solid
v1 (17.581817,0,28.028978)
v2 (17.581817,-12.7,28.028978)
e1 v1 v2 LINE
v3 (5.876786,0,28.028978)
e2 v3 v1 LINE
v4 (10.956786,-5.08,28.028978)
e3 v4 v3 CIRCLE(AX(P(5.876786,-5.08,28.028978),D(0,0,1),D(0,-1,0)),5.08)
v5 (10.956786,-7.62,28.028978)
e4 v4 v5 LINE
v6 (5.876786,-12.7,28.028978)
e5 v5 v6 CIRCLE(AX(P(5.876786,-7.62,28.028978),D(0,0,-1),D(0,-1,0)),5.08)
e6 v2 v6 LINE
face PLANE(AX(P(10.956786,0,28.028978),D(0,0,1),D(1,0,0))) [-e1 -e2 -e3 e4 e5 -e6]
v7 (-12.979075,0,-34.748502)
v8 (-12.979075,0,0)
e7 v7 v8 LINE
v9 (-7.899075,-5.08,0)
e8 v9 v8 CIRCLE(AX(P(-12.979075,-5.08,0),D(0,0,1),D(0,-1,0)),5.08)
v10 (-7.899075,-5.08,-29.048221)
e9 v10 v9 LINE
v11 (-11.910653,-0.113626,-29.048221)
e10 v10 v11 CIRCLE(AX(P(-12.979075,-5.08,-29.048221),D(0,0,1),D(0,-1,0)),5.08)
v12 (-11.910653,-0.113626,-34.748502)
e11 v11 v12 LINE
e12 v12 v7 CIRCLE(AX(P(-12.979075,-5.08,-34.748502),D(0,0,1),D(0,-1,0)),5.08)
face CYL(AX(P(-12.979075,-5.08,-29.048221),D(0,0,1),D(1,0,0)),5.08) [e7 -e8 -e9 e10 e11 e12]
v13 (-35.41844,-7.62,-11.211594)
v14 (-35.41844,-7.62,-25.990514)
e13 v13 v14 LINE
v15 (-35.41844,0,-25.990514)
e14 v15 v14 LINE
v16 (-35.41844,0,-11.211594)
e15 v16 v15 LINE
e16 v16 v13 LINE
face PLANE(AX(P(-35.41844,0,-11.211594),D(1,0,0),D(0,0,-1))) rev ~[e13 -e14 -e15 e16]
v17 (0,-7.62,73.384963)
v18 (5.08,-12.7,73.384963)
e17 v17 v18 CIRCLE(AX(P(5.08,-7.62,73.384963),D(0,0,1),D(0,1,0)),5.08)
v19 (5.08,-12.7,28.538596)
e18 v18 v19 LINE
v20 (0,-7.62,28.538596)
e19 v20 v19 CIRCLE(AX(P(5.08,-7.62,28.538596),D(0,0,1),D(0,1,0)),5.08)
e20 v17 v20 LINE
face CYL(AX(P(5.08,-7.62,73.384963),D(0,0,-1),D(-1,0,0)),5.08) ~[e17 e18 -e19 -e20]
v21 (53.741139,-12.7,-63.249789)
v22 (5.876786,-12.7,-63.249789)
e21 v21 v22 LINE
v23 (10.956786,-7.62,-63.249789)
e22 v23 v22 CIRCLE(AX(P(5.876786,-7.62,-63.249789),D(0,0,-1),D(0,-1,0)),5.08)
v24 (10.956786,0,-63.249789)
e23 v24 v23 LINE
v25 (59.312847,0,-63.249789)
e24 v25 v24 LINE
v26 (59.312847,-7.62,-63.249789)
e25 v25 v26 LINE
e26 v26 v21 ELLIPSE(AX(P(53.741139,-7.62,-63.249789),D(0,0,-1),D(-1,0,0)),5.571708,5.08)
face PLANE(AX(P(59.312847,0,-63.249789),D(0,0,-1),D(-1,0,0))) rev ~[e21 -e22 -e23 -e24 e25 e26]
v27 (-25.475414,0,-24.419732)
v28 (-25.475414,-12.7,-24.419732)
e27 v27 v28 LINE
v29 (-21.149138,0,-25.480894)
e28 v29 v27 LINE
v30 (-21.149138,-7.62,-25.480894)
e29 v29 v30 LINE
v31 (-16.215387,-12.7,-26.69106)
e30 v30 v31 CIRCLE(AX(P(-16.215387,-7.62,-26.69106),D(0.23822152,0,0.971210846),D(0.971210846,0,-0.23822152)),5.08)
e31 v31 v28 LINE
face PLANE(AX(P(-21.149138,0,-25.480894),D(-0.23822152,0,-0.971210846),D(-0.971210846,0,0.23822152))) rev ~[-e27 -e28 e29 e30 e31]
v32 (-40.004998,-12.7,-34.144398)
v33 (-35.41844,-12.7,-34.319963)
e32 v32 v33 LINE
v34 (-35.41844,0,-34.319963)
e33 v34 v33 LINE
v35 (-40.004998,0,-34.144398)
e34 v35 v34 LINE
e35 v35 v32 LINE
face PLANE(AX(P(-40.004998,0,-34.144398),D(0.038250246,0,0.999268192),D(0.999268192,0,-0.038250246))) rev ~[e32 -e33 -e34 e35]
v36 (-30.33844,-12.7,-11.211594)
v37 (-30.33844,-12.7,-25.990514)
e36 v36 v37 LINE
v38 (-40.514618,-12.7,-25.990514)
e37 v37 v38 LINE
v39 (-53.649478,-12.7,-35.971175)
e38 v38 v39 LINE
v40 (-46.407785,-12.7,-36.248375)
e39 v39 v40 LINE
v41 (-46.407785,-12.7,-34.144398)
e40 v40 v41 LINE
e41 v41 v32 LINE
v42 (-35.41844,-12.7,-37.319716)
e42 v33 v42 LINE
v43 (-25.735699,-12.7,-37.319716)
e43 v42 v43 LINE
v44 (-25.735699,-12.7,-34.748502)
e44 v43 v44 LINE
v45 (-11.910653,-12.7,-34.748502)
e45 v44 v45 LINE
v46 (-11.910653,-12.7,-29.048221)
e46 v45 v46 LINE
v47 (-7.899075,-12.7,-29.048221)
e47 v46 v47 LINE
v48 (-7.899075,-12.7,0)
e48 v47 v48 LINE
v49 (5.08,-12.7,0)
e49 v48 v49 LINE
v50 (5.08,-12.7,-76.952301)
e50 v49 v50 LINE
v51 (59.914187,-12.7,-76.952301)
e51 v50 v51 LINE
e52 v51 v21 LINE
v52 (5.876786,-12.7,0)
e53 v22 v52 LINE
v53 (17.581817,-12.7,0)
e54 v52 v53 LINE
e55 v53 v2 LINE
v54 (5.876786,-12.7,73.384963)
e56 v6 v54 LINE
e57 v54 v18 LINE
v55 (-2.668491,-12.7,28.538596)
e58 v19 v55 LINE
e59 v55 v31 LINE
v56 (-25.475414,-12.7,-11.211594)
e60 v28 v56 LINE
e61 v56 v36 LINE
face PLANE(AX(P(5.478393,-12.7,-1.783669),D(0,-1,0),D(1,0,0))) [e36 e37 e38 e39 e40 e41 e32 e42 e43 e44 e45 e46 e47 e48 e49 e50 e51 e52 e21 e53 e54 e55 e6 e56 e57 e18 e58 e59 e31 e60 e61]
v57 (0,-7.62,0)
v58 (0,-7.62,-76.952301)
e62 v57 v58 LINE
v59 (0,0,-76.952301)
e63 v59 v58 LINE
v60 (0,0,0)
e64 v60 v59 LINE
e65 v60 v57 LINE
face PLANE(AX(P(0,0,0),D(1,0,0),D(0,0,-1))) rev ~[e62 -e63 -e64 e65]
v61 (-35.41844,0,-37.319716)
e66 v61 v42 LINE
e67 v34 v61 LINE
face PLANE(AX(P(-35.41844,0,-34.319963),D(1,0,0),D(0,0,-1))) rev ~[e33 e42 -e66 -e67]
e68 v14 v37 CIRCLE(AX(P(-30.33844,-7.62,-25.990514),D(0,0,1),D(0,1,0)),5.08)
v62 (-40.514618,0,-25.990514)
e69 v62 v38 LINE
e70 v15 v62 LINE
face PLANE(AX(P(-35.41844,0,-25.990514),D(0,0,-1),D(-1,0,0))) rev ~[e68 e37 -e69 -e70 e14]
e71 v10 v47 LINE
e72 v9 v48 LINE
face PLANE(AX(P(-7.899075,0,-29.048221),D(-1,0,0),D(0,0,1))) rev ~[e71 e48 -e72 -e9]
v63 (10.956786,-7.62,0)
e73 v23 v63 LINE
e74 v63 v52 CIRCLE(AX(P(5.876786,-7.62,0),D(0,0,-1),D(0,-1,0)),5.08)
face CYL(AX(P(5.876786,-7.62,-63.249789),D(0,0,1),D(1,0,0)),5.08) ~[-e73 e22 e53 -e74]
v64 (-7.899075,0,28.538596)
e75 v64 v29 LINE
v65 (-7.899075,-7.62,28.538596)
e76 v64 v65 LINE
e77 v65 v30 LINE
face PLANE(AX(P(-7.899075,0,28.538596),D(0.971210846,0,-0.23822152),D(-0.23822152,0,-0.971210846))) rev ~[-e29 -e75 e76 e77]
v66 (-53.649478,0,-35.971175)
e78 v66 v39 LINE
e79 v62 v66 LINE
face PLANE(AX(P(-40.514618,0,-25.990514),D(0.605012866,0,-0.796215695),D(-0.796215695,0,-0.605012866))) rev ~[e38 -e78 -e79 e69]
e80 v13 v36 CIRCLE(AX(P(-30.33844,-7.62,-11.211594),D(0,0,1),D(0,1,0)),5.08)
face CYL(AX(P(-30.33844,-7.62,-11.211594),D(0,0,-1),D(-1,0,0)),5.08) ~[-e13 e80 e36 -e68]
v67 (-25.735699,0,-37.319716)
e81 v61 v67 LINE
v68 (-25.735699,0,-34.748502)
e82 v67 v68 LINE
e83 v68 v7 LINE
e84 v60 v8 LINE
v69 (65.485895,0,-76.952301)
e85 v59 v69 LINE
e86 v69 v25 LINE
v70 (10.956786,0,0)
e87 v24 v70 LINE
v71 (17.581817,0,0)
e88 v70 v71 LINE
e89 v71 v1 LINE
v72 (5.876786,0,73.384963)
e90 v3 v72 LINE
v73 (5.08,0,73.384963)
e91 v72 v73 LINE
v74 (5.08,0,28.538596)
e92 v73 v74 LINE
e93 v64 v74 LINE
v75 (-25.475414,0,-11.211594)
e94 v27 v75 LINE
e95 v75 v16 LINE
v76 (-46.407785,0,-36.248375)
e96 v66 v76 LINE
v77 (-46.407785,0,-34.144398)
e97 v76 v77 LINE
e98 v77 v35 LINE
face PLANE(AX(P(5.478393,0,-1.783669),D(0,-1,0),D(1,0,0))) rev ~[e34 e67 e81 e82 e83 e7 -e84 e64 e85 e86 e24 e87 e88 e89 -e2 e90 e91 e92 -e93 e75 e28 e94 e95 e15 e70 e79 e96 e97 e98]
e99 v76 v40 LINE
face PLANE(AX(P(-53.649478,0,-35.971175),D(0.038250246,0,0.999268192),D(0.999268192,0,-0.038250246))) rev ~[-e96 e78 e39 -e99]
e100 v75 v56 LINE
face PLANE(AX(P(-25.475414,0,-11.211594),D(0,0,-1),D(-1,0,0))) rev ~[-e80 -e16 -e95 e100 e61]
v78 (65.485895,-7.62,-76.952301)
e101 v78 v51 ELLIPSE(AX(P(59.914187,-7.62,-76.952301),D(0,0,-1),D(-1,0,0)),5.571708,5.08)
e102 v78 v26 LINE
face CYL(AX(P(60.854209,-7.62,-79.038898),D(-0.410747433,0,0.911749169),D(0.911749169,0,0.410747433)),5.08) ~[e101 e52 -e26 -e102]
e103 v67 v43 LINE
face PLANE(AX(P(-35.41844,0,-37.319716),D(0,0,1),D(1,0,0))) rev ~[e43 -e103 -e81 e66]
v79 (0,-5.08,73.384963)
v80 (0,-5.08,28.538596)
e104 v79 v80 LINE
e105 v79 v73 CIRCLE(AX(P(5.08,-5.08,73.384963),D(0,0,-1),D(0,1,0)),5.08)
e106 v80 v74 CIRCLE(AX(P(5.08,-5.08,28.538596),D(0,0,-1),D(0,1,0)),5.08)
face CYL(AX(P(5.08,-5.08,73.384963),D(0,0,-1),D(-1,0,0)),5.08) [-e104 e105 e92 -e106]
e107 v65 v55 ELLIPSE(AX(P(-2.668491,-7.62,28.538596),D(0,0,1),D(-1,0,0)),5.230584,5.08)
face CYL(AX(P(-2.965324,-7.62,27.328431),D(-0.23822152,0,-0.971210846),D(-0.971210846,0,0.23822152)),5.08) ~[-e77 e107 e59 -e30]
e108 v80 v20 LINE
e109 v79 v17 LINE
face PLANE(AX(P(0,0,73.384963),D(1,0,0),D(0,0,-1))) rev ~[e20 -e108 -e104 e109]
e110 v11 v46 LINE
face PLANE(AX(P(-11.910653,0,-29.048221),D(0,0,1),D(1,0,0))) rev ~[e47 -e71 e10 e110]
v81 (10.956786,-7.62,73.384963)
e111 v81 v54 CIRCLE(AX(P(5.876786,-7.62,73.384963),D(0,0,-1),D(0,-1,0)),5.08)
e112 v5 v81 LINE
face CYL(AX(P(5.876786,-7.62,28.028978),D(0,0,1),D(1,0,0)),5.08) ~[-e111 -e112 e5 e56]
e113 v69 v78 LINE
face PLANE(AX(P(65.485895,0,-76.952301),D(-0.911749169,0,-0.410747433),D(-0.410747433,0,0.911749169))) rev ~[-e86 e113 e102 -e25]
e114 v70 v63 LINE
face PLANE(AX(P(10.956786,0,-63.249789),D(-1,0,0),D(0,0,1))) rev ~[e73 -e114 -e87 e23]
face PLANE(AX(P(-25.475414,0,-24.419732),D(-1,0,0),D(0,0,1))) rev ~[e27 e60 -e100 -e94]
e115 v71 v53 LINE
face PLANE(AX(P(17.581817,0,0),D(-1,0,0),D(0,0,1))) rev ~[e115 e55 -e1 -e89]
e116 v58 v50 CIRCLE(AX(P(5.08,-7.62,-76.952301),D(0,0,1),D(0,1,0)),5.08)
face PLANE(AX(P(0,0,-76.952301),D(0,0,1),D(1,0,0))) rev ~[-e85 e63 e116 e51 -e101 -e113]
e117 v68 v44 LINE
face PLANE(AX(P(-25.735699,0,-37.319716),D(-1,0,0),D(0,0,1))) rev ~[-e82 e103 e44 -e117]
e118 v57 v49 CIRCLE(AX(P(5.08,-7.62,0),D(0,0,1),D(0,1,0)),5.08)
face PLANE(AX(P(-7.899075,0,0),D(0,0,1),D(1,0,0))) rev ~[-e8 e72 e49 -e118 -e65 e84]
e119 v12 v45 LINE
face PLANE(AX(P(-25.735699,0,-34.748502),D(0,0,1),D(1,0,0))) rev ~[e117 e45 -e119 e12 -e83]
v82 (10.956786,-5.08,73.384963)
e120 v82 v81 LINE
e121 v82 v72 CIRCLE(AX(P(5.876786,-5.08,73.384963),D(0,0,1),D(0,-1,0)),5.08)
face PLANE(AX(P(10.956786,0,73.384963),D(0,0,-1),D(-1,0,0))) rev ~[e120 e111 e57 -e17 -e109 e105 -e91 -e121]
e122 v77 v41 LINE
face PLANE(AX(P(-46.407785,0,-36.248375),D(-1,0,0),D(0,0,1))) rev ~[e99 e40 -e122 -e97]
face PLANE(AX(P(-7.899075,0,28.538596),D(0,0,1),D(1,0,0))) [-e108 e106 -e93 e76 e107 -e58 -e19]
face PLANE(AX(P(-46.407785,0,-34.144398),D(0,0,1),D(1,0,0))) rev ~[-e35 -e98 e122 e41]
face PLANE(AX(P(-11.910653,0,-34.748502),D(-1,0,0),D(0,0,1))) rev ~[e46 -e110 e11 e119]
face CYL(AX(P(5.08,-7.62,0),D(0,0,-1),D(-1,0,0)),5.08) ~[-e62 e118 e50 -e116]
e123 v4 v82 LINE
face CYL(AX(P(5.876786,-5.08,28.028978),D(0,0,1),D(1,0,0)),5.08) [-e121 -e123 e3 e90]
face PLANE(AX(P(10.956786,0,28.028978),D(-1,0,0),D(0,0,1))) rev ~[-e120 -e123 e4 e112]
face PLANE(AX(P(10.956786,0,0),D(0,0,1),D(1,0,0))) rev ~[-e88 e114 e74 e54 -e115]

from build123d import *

# Parameters (mm, degrees)
F0_W     = 7.8990748152
F0_H     = 28.538595885
F0_W_2   = 6.6250311211
F0_H_2   = 28.0289780349
F1_DEPTH = 12.7
F2_R     = 5.08


# Not quite as in the source:
# - two fillets or chamfers of one size are made in one step


with BuildPart() as f1:
    # F0 (on Front) → F1 (new body)
    with BuildSketch(Plane.XZ):
        Polygon((10.9567856416, 73.384962976), (0, 73.384962976), (0, 28.538595885), (0, 0), (0, -76.9523009658), (10.9567856416, -76.9523009658), (10.9567856416, -63.2497891784), (10.9567856416, -57.5868189335), (10.9567856416, 0), (10.9567856416, 28.0289780349), align=None)
        with Locations((-3.9495374076, 14.2692979425)):
            Rectangle(F0_W, F0_H)
        with Locations((14.2693012021, 14.0144890174)):
            Rectangle(F0_W_2, F0_H_2)
        Polygon((-7.8990748152, 0), (-7.8990748152, 28.538595885), (-21.1491379887, -25.4808943719), (-25.4754136512, -24.4197324549), (-25.7356986403, -29.0482211858), (-11.9106527418, -29.0482211858), (-7.8990748152, -29.0482211858), align=None)
        Polygon((10.9567856416, -63.2497891784), (10.9567856416, -76.9523009658), (65.48589468, -76.9523009658), (59.3128465116, -63.2497891784), align=None)
        Polygon((-25.7356986403, -29.0482211858), (-25.4754136512, -24.4197324549), (-25.4754136512, -11.2115936354), (-35.4184396565, -11.2115936354), (-35.4184396565, -25.9905140847), (-40.5146181583, -25.9905140847), (-53.649477917, -35.9711753499), (-46.4077852666, -36.2483747303), (-46.4077852666, -34.144397825), (-40.0049984455, -34.144397825), (-35.4184396565, -34.3199633062), (-35.4184396565, -37.3197160661), (-25.7356986403, -37.3197160661), (-25.7356986403, -34.7485020757), (-11.9106527418, -34.7485020757), (-11.9106527418, -29.0482211858), align=None)
    extrude(amount=F1_DEPTH)

    # F2
    f2_edges = [f1.edges().sort_by_distance(p)[0] for p in [
        (-35.41844, -12.7, -18.601054),
        (10.956786, -12.7, -31.624895),
        (0, -12.7, 50.961779),
        (0, -12.7, -38.47615),
        (0, 0, 50.961779),
        (-14.524106, -12.7, 1.528851),
        (-7.899075, 0, -14.524111),
        (62.399371, -12.7, -70.101045),
        (10.956786, 0, 50.706971),
        (10.956786, -12.7, 50.706971),
    ]]
    fillet(f2_edges, radius=F2_R)


solid = f1.part
